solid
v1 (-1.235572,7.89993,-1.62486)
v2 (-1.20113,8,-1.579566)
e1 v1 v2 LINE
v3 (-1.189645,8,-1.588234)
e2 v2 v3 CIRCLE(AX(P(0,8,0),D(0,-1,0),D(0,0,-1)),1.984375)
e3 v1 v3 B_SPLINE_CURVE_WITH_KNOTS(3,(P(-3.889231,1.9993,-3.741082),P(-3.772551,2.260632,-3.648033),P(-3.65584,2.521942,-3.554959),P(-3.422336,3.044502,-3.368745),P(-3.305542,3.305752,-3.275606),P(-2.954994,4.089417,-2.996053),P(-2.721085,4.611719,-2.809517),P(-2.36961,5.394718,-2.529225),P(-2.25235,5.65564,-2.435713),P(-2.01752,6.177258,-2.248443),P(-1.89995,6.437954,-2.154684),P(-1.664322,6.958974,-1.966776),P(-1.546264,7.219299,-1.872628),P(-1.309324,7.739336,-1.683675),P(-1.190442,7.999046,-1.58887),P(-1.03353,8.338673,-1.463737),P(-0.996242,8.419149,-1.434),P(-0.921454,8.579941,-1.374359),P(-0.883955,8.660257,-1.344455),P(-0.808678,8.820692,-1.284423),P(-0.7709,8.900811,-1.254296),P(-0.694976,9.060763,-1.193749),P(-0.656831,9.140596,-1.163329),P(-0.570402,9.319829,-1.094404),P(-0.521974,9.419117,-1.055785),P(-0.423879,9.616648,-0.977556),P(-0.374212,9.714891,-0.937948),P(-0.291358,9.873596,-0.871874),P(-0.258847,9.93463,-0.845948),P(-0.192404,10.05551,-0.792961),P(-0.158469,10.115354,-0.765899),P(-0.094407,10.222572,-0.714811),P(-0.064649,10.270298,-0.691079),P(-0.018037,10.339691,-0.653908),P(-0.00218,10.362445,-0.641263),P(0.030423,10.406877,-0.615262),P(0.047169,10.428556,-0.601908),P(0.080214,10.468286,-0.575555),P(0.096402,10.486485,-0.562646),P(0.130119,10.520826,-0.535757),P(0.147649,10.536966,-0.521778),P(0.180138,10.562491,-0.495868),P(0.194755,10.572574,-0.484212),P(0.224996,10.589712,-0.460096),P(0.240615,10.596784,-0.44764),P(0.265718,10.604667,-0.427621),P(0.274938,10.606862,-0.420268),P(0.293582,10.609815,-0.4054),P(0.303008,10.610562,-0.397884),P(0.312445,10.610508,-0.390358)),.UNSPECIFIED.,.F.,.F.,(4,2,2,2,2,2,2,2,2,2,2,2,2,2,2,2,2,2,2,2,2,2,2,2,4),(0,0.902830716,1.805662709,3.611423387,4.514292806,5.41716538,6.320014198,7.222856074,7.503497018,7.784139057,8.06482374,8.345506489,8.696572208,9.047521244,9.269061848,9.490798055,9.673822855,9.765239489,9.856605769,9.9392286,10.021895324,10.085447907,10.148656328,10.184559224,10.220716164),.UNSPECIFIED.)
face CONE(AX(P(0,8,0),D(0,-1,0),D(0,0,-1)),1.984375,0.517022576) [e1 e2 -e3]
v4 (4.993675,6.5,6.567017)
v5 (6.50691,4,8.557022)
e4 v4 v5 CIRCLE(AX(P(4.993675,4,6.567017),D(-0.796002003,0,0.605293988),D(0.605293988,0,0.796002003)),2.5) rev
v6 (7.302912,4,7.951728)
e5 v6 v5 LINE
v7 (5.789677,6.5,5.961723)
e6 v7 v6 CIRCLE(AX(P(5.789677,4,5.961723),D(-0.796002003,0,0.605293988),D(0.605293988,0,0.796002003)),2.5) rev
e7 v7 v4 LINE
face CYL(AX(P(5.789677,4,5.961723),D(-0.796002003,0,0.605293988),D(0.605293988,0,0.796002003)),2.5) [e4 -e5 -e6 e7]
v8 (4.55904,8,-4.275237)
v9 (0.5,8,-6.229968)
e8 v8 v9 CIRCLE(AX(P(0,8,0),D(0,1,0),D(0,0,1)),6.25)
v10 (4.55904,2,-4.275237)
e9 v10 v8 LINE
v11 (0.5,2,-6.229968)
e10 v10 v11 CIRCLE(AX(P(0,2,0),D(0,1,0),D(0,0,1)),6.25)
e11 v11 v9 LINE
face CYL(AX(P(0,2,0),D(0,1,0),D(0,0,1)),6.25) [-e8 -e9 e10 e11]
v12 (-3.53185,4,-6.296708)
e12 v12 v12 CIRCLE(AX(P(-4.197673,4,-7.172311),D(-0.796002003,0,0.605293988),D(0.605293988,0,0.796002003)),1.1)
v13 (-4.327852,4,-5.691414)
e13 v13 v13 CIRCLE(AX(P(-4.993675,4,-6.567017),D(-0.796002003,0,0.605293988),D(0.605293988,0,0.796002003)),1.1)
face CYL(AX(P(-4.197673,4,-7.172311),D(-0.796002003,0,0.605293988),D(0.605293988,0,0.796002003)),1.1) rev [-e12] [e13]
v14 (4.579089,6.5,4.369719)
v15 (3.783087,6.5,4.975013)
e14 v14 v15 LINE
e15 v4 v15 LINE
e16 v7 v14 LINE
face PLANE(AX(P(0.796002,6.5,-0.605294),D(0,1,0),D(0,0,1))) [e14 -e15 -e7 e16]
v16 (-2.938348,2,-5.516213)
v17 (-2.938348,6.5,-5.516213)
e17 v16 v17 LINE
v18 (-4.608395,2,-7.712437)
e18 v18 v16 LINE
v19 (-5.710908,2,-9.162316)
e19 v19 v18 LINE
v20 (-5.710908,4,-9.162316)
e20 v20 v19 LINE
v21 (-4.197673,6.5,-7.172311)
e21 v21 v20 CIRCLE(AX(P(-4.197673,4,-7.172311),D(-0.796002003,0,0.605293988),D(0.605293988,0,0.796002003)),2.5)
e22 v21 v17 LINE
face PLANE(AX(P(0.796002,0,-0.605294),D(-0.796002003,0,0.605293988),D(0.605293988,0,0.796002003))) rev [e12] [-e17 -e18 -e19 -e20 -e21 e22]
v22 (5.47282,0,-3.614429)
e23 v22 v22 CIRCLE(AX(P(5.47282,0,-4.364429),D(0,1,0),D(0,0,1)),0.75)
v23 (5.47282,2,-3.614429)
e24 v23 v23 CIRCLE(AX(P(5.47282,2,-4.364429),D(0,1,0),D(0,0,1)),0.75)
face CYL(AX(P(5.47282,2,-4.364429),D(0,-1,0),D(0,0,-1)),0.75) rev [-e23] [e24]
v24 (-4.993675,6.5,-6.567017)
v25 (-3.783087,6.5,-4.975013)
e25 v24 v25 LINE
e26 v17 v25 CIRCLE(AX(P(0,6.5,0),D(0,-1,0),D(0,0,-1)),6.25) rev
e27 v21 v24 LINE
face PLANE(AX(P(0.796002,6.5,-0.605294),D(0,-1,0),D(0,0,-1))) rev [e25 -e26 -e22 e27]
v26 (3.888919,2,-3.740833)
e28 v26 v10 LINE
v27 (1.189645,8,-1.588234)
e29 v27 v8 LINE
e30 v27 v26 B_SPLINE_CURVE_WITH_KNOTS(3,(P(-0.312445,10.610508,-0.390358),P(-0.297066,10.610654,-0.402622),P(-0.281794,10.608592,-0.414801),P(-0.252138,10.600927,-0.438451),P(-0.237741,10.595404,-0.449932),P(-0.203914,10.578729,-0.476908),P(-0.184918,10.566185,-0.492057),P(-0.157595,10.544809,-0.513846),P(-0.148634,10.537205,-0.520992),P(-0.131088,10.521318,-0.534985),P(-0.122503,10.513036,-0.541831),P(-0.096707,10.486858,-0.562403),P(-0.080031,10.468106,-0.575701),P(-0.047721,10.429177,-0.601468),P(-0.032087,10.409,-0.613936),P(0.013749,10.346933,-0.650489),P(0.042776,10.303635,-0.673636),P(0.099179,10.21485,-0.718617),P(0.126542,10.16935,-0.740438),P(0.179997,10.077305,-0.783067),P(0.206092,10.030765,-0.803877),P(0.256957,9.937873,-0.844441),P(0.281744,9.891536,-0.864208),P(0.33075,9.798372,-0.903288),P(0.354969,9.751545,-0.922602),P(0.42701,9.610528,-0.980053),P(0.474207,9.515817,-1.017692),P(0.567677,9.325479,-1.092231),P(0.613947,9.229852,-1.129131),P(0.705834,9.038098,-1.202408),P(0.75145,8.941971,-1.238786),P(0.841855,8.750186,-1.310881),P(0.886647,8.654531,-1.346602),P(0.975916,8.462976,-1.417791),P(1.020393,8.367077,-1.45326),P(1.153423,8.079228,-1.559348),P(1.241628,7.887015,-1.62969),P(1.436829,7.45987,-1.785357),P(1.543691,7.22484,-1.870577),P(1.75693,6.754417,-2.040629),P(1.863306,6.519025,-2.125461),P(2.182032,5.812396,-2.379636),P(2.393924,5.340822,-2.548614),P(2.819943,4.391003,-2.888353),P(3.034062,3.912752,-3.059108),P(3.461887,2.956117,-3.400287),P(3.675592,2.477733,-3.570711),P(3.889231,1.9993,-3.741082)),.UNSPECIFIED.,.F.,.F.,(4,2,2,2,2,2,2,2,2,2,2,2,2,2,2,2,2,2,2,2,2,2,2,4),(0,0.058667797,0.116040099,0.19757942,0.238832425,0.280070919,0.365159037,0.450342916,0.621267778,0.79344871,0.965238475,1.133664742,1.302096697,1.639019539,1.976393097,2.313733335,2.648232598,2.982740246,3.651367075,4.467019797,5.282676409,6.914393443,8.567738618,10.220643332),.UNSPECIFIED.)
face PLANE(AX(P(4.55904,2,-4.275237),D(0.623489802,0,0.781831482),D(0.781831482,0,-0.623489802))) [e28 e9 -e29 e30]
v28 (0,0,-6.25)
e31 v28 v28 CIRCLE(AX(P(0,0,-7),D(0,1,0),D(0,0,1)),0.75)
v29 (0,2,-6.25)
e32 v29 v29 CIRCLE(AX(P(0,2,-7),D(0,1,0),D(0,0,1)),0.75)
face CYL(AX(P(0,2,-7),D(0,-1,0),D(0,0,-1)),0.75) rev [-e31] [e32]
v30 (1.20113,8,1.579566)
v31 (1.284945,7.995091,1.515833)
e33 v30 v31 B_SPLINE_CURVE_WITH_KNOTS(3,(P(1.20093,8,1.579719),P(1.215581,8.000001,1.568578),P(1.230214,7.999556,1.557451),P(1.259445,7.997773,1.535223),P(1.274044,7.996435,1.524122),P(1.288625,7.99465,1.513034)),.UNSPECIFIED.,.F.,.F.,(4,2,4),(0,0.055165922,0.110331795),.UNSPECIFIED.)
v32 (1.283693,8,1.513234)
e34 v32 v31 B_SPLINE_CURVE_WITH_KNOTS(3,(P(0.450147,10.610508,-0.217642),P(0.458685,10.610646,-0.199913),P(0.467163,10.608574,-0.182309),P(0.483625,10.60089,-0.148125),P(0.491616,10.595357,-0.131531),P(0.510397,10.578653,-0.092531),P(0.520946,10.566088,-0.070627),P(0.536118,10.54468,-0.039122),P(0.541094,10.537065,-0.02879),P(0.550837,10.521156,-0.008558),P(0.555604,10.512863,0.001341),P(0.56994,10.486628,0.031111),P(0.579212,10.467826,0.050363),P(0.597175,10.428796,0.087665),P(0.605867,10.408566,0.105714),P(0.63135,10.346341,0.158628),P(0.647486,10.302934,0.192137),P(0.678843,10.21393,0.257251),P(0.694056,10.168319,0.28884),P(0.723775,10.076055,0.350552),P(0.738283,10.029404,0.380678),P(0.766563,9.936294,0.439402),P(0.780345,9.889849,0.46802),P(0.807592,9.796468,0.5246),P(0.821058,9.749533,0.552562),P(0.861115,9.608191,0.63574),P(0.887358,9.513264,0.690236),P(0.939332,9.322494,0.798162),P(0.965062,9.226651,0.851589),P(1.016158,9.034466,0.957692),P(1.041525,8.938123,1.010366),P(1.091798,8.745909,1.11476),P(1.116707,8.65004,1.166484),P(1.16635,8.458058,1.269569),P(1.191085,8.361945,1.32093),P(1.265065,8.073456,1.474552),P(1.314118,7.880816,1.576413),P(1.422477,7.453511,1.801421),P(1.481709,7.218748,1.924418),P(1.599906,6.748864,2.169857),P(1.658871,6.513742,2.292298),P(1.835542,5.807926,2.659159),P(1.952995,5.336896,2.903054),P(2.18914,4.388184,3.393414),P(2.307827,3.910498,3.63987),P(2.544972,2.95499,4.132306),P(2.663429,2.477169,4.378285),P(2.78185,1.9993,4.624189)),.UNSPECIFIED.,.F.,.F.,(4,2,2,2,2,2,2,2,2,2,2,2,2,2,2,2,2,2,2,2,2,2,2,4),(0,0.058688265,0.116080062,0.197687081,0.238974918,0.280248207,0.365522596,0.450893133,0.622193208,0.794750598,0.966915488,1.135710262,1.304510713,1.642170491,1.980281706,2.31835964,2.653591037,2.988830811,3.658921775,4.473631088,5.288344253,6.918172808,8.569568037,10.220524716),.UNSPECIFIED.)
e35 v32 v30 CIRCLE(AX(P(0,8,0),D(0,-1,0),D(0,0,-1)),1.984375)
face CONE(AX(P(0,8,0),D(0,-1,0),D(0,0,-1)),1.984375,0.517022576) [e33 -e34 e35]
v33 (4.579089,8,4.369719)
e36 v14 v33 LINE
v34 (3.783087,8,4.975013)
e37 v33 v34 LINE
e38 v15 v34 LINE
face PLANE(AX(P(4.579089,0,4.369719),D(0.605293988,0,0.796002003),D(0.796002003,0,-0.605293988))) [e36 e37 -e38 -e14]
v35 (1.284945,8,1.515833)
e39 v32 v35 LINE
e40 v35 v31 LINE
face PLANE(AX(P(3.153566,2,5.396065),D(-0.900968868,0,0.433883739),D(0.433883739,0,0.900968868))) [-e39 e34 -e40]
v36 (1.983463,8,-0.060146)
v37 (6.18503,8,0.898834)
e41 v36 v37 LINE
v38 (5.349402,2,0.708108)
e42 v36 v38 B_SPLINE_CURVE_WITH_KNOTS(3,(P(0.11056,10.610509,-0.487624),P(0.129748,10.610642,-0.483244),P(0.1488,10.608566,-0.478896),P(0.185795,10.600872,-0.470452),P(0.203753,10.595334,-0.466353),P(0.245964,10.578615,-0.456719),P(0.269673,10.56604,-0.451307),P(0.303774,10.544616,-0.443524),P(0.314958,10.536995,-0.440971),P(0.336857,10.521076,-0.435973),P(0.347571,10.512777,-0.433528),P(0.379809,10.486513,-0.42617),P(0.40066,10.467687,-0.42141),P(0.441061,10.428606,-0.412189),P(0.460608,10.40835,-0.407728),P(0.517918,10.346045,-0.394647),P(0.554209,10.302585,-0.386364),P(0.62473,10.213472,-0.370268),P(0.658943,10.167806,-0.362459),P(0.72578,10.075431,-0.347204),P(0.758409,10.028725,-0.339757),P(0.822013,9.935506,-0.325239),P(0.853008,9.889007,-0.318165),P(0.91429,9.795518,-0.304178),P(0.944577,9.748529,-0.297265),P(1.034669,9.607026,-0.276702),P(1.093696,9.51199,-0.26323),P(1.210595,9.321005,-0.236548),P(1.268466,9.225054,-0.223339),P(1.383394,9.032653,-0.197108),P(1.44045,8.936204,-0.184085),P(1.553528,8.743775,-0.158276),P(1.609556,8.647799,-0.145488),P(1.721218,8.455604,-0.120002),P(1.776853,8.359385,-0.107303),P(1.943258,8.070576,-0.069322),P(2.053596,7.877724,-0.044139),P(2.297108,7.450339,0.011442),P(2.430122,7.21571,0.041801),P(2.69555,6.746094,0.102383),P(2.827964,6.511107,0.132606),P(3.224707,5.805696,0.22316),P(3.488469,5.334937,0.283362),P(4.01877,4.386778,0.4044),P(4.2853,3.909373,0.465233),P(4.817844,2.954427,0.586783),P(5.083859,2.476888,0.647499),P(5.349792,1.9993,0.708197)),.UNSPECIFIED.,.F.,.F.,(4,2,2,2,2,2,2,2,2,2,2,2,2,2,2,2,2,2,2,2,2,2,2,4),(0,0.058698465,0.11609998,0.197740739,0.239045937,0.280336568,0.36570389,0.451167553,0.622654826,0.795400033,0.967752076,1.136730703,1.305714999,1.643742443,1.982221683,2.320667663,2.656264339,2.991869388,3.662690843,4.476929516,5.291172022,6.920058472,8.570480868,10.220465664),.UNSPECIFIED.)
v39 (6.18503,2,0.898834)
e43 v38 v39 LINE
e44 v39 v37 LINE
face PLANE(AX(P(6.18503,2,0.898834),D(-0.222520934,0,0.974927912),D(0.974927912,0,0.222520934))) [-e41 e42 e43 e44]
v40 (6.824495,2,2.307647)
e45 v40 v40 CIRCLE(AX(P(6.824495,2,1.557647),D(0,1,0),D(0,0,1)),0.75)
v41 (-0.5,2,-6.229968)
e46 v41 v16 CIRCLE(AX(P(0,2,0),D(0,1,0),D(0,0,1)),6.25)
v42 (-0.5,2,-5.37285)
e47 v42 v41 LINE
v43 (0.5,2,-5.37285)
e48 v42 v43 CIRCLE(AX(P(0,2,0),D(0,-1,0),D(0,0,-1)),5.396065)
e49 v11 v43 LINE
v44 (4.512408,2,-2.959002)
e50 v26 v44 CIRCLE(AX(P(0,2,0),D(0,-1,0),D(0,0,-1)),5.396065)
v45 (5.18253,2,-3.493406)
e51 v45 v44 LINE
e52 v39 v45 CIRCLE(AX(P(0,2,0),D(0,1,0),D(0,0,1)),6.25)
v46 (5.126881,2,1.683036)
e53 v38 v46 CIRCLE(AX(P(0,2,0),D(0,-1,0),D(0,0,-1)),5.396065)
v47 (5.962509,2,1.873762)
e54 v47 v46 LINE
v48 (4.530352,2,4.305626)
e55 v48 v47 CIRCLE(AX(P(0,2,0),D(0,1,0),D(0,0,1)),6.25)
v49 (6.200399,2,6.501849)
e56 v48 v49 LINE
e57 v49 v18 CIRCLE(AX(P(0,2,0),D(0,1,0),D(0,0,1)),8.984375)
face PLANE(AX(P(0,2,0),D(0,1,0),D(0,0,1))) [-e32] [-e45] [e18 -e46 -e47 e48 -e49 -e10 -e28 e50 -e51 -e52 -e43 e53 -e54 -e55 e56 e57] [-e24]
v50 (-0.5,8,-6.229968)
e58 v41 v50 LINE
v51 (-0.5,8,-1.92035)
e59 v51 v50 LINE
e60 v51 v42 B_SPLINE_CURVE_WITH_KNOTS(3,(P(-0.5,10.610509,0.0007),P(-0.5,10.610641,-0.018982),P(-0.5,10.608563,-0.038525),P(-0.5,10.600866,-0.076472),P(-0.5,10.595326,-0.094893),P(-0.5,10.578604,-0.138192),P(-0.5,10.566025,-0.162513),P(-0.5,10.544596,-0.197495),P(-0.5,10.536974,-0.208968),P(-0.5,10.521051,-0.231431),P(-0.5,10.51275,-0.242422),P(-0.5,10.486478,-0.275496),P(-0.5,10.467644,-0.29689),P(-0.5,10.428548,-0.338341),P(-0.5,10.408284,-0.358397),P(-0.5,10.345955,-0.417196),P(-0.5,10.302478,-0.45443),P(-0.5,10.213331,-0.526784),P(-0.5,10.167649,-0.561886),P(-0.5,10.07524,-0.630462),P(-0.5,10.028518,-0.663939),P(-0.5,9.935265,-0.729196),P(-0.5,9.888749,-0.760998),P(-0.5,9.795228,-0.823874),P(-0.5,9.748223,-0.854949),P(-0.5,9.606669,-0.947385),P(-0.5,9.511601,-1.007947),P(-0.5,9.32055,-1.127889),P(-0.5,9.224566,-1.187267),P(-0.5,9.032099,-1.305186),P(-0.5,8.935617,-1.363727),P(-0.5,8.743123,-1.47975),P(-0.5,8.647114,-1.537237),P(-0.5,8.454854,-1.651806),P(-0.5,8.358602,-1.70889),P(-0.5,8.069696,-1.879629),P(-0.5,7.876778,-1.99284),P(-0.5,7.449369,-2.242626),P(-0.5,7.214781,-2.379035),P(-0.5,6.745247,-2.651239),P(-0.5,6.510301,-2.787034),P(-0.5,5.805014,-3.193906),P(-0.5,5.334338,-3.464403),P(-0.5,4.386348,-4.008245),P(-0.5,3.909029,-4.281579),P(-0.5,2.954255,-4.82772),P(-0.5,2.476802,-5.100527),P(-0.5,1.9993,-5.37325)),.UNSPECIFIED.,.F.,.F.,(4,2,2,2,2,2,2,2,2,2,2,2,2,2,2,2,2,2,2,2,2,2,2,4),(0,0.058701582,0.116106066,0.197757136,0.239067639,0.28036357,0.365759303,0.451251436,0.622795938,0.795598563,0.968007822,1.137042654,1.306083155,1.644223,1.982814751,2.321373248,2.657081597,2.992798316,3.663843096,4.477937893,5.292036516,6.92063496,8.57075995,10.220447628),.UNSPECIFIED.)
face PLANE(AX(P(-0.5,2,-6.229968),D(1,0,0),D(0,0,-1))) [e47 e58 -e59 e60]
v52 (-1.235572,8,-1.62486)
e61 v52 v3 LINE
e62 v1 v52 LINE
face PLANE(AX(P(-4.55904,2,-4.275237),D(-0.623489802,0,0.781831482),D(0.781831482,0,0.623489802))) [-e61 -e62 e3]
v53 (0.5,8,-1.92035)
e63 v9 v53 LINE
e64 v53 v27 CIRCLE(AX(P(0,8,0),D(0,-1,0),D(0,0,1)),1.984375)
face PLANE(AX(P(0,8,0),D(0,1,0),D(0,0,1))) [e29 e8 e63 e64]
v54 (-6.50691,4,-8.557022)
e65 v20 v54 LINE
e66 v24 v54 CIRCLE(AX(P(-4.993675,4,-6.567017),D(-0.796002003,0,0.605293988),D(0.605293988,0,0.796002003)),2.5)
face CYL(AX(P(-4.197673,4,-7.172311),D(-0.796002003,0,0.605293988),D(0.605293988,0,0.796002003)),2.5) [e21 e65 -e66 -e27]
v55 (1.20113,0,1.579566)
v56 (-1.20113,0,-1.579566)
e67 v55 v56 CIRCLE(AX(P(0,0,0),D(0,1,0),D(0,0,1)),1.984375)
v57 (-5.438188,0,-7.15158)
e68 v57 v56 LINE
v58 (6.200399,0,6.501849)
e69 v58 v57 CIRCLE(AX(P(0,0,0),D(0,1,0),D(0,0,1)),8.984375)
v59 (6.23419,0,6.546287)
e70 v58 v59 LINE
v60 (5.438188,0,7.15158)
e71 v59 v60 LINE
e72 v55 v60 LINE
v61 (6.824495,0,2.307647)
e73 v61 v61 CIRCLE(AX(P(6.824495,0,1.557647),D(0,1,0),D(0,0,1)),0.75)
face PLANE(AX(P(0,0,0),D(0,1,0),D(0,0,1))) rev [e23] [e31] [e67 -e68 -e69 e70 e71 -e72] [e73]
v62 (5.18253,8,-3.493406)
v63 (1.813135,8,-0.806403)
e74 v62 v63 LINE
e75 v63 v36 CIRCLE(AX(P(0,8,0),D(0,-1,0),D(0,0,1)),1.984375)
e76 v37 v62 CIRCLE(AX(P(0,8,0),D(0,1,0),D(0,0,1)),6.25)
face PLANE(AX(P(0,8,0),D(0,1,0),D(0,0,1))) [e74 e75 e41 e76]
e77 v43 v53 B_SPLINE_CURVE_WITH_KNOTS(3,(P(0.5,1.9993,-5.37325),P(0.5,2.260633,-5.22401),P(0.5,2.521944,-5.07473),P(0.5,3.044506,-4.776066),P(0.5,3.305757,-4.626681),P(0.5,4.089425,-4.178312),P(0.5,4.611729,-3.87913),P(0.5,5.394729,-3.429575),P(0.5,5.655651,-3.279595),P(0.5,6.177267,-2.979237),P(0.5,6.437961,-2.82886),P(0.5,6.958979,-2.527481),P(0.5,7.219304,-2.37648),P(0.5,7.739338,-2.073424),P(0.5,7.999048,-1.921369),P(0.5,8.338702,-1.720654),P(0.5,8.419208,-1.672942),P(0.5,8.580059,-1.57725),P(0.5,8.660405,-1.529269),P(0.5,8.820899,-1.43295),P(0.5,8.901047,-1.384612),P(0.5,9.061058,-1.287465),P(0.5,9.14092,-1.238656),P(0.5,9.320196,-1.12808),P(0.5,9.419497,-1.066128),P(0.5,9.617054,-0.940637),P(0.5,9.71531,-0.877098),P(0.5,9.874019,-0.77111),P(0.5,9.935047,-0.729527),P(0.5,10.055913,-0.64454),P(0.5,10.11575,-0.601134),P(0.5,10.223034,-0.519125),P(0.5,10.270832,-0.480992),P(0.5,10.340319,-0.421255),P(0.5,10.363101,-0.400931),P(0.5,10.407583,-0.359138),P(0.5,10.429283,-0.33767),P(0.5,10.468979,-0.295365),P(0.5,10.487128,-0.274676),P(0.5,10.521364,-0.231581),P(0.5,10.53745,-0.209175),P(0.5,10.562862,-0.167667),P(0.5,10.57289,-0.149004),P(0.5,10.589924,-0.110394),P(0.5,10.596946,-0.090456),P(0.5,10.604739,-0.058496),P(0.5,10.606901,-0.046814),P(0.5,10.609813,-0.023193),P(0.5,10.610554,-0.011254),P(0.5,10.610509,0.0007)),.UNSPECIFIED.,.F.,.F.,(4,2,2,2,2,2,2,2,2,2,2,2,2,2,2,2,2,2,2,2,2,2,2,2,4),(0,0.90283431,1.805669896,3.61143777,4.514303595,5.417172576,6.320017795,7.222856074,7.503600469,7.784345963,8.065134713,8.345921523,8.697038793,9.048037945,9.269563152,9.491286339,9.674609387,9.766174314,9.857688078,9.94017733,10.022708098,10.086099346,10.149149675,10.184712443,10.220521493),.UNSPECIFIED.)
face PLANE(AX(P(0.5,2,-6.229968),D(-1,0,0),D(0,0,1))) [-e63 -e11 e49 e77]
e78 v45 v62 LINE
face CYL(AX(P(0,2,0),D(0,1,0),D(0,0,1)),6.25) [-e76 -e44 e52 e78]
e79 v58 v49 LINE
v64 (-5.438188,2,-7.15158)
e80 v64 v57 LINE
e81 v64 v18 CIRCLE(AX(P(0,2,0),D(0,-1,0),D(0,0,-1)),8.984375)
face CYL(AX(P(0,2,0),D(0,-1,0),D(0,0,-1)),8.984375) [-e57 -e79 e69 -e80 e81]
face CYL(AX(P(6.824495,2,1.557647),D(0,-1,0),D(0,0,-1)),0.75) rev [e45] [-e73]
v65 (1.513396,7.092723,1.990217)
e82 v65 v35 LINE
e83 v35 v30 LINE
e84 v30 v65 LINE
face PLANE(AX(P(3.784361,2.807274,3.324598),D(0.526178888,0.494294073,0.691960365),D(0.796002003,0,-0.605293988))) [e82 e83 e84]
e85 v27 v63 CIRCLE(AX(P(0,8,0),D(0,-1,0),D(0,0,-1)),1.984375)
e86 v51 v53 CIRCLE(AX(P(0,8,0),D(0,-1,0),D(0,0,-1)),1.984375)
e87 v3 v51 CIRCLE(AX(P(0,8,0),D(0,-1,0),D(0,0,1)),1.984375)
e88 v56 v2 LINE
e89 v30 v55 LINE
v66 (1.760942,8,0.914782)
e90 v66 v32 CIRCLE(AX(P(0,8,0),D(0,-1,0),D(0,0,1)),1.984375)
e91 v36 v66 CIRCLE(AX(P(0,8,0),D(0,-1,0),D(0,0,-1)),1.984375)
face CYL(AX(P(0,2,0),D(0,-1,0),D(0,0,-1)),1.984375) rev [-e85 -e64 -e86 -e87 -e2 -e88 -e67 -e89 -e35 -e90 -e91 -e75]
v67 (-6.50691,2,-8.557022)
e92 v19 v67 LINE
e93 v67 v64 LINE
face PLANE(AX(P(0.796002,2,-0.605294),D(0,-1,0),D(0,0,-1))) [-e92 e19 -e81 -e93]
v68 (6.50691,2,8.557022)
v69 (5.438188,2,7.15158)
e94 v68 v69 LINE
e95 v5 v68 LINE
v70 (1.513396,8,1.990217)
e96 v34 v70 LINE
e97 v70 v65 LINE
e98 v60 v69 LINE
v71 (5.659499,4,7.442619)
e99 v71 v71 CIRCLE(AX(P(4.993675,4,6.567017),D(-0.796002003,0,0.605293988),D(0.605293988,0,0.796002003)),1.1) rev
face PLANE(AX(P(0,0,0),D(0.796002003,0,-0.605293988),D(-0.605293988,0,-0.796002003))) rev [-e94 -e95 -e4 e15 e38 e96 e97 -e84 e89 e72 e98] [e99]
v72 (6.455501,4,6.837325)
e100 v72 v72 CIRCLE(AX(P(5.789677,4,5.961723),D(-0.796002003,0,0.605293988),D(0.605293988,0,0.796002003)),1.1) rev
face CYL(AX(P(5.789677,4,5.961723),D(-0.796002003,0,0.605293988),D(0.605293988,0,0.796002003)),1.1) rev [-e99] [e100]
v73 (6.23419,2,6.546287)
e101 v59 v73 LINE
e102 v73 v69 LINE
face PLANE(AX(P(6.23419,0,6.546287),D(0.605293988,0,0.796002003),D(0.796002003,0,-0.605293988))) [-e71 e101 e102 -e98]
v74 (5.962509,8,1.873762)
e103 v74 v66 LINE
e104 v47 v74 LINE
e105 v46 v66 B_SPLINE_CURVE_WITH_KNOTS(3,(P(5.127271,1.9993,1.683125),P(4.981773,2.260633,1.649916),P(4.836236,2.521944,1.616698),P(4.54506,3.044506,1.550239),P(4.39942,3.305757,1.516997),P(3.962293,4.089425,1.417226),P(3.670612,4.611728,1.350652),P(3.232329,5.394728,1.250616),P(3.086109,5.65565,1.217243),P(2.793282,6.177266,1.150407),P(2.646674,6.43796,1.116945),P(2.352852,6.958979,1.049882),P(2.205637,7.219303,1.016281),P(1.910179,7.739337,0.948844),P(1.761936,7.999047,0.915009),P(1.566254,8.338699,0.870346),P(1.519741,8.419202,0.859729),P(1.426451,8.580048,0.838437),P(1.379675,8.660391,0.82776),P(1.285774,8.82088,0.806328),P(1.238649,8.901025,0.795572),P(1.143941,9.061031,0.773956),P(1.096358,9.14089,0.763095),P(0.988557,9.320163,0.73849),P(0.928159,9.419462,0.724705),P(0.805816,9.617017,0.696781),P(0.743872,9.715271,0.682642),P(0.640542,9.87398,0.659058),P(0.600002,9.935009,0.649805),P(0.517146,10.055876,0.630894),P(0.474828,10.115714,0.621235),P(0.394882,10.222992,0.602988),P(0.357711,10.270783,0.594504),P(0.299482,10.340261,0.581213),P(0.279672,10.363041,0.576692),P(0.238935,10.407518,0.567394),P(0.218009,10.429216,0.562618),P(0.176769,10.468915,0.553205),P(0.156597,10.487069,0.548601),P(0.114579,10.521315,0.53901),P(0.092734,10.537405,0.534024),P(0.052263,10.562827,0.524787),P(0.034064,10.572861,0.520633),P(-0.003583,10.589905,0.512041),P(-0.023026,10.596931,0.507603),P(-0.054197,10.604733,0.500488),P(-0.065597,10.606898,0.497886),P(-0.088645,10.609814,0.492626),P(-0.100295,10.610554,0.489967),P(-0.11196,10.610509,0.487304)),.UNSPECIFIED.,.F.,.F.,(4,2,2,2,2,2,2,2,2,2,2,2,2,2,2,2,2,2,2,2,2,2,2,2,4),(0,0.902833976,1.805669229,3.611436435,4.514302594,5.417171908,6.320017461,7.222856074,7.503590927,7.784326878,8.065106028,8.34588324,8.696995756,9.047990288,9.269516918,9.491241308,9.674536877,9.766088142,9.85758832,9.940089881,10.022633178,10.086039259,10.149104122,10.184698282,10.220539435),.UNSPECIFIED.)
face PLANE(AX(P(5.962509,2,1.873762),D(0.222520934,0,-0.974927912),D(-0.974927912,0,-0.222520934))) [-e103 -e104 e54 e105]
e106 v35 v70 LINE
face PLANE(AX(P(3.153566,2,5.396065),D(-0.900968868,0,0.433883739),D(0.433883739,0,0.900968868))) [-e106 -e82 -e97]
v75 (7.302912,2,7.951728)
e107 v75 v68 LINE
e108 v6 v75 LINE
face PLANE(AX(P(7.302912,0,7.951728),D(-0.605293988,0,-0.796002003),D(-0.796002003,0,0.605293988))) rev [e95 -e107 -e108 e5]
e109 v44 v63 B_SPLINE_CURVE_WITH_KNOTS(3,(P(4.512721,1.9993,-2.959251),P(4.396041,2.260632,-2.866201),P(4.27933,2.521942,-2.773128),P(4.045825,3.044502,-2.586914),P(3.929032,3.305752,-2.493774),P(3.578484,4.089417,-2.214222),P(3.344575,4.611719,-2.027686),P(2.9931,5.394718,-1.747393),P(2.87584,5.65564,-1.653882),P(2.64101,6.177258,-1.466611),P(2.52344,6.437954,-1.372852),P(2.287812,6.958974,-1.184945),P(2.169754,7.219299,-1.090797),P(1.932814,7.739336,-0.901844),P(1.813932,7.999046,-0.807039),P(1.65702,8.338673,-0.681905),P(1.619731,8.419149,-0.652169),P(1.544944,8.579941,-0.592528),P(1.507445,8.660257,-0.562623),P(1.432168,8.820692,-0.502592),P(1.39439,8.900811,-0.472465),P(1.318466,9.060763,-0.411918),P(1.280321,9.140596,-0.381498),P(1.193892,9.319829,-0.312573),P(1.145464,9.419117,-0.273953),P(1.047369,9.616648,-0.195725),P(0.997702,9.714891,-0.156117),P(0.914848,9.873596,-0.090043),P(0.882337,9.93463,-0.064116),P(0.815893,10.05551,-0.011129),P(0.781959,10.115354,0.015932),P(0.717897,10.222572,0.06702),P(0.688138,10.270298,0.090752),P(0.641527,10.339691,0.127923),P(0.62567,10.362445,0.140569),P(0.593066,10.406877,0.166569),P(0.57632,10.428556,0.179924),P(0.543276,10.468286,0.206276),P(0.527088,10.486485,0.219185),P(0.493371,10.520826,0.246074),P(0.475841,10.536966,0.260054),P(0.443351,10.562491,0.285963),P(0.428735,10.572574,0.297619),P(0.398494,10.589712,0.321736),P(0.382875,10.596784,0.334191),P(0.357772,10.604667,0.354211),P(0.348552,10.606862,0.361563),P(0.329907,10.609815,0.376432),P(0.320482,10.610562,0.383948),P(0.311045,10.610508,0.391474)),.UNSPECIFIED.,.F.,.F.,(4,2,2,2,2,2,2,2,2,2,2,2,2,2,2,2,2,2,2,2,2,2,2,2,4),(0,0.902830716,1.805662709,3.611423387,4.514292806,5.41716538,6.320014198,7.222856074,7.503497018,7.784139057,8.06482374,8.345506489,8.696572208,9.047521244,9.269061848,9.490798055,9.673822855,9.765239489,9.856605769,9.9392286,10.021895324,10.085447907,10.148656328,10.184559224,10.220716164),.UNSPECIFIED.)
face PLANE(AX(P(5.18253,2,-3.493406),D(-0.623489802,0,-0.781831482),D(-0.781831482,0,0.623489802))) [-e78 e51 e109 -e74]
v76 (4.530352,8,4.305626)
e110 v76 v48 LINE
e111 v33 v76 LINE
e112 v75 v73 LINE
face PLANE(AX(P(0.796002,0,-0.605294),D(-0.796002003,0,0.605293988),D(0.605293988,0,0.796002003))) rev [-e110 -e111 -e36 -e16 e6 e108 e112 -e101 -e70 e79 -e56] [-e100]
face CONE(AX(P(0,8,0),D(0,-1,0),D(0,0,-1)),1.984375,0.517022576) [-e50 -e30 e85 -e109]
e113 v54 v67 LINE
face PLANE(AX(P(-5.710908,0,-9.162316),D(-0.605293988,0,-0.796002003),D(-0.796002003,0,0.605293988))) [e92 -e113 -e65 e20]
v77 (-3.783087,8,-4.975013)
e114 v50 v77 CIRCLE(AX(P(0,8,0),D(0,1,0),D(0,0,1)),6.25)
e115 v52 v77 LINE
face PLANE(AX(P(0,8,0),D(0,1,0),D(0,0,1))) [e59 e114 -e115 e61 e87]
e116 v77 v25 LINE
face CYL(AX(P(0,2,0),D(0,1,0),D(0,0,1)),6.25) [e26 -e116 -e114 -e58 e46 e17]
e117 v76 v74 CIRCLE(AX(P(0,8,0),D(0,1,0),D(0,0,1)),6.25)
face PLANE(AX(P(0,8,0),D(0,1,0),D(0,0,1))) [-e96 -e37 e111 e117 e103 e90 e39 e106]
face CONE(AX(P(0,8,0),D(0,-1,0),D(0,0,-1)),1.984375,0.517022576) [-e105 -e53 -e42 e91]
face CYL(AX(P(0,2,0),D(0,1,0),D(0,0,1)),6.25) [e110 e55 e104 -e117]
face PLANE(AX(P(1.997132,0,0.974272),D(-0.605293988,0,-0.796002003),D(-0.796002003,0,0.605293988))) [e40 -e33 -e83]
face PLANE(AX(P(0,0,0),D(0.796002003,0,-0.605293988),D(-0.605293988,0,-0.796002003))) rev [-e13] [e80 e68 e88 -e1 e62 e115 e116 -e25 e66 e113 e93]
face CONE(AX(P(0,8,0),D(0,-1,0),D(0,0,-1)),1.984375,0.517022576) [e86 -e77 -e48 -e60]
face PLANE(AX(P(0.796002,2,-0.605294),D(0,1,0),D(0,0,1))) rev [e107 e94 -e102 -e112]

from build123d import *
from build123d.topology import SkipClean

# Parameters (mm, degrees)
SKETCH1_R               = 8.984375
SKETCH1_R_2             = 1.984375
SKETCH1_R_3             = 0.75
BOSS_EXTRUDE1_DEPTH     = 2
SKETCH6_W               = 17.96875
SKETCH6_H               = 8
CUT_EXTRUDE1_DEPTH      = 16.014593
BOSS_EXTRUDE4_START     = -1
BOSS_EXTRUDE4_OUTLINE_R = 1.1
BOSS_EXTRUDE4_DEPTH     = 1


with BuildPart() as part:
    # Sketch1 → Boss-Extrude1 (new body)
    with BuildSketch(Plane(origin=(0, 0, 0), x_dir=(1, 0, 0), z_dir=(0, 1, 0))):
        with Locations(Location((0, 0, 0), (0, 0, 270))):
            Circle(SKETCH1_R)
        with Locations(Location((0, 0, 0), (0, 0, 270))):
            Circle(SKETCH1_R_2, mode=Mode.SUBTRACT)
        with Locations(Location((0, 7, 0), (0, 0, 270))):
            Circle(SKETCH1_R_3, mode=Mode.SUBTRACT)
        with Locations(Location((5.47282, 4.364429, 0), (0, 0, 270))):
            Circle(SKETCH1_R_3, mode=Mode.SUBTRACT)
        with Locations(Location((6.824495, -1.557647, 0), (0, 0, 270))):
            Circle(SKETCH1_R_3, mode=Mode.SUBTRACT)
        with Locations(Location((3.037186, -6.306782, 0), (0, 0, 270))):
            Circle(SKETCH1_R_3, mode=Mode.SUBTRACT)
        with Locations(Location((-3.037186, -6.306782, 0), (0, 0, 270))):
            Circle(SKETCH1_R_3, mode=Mode.SUBTRACT)
        with Locations(Location((-6.824495, -1.557647, 0), (0, 0, 270))):
            Circle(SKETCH1_R_3, mode=Mode.SUBTRACT)
        with Locations(Location((-5.47282, 4.364429, 0), (0, 0, 270))):
            Circle(SKETCH1_R_3, mode=Mode.SUBTRACT)
    extrude(amount=BOSS_EXTRUDE1_DEPTH)

    # Sweep1: sweep along a path in Sketch3
    with SkipClean():  # the faces are left unmerged after this step: merging them gives an invalid solid
        with BuildLine(Plane(origin=(0, 0, 0), x_dir=(0, 0, -1), z_dir=(1, 0, 0))) as sweep1_path:
            Line((0, 2), (0, 8))
        # Sketch2 → Sweep1 (sweep)
        with BuildSketch(Plane(origin=(0, 2, 0), x_dir=(1, 0, 0), z_dir=(0, 1, 0))):
            with BuildLine():
                Line((-0.5, 6.229968), (-0.5, 1.92035))
                ThreePointArc((-0.5, 1.92035), (-0.860988, 1.78786), (-1.189645, 1.588234))
                Line((-1.189645, 1.588234), (-4.55904, 4.275237))
                ThreePointArc((-4.55904, 4.275237), (-2.711773, 5.631055), (-0.5, 6.229968))
            make_face()
            with BuildLine():
                Line((0.5, 6.229968), (0.5, 1.92035))
                ThreePointArc((0.5, 1.92035), (0.860988, 1.78786), (1.189645, 1.588234))
                Line((1.189645, 1.588234), (4.55904, 4.275237))
                ThreePointArc((4.55904, 4.275237), (2.711773, 5.631055), (0.5, 6.229968))
            make_face()
            with BuildLine():
                Line((5.18253, 3.493406), (1.813135, 0.806403))
                ThreePointArc((1.813135, 0.806403), (1.934623, 0.441565), (1.983463, 0.060146))
                Line((1.983463, 0.060146), (6.18503, -0.898834))
                ThreePointArc((6.18503, -0.898834), (6.093299, 1.390756), (5.18253, 3.493406))
            make_face()
            with BuildLine():
                Line((5.962509, -1.873762), (1.760942, -0.914782))
                ThreePointArc((1.760942, -0.914782), (1.551447, -1.237238), (1.283693, -1.513234))
                Line((1.283693, -1.513234), (3.153566, -5.396065))
                ThreePointArc((3.153566, -5.396065), (4.886447, -3.896811), (5.962509, -1.873762))
            make_face()
            with BuildLine():
                Line((2.252597, -5.829949), (0.382724, -1.947117))
                ThreePointArc((0.382724, -1.947117), (0, -1.984375), (-0.382724, -1.947117))
                Line((-0.382724, -1.947117), (-2.252597, -5.829949))
                ThreePointArc((-2.252597, -5.829949), (0, -6.25), (2.252597, -5.829949))
            make_face()
            with BuildLine():
                Line((-3.153566, -5.396065), (-1.283693, -1.513234))
                ThreePointArc((-1.283693, -1.513234), (-1.551447, -1.237238), (-1.760942, -0.914782))
                Line((-1.760942, -0.914782), (-5.962509, -1.873762))
                ThreePointArc((-5.962509, -1.873762), (-4.886447, -3.896811), (-3.153566, -5.396065))
            make_face()
            with BuildLine():
                Line((-6.18503, -0.898834), (-1.983463, 0.060146))
                ThreePointArc((-1.983463, 0.060146), (-1.934623, 0.441565), (-1.813135, 0.806403))
                Line((-1.813135, 0.806403), (-5.18253, 3.493406))
                ThreePointArc((-5.18253, 3.493406), (-6.093299, 1.390756), (-6.18503, -0.898834))
            make_face()
        sweep(path=sweep1_path.line)

    # Sketch4 → Revolve1 (revolve)
    with SkipClean():  # the faces are left unmerged after this step: merging them gives an invalid solid
        with BuildSketch(Plane(origin=(0, 0, 0), x_dir=(0, 0, -1), z_dir=(1, 0, 0)), mode=Mode.PRIVATE) as revolve1_sk:
            Polygon((-5.396065, 2), (-1.984375, 2), (-1.984375, 8), align=None)
        revolve(revolve1_sk.sketch.rotate(Axis((0, 0, 0), (0, 1, 0)), 165.405971), axis=Axis((0, 0, 0), (0, 1, 0)))

    # Sketch6 → Cut-Extrude1 (cut, through all)
    with BuildSketch(Plane(origin=(0, 0, 0), x_dir=(0.6052939880428899, 0, 0.7960020025346255), z_dir=(-0.7960020025346255, 0, 0.6052939880428899))):
        with Locations((0, 4)):
            Rectangle(SKETCH6_W, SKETCH6_H)
    extrude(amount=CUT_EXTRUDE1_DEPTH, mode=Mode.SUBTRACT)

    # Boss-Extrude4: read off the stored shape, not the designer's step
    # Boss-Extrude4 outline → Boss-Extrude4 (add)
    # profile 1 of 2: a face of its own
    with BuildSketch(Plane(origin=(0, 0, 0), x_dir=(0.60529398804289, 0, 0.7960020025346255), z_dir=(-0.7960020025346254, 0, 0.6052939880428899)).offset(BOSS_EXTRUDE4_START)):
        with BuildLine():
            Line((-6.169481, 6.5), (-8.25, 6.5))
            ThreePointArc((-8.25, 6.5), (-10.017767, 5.767767), (-10.75, 4))
            Line((-10.75, 4), (-10.75, 2))
            Line((-10.75, 2), (-6.169481, 2))
            Line((-6.169481, 2), (-6.169481, 6.5))
        make_face()
        with Locations((-8.25, 4)):
            Circle(BOSS_EXTRUDE4_OUTLINE_R, mode=Mode.SUBTRACT)
    # profile 2 of 2: a face of its own
    with BuildSketch(Plane(origin=(0, 0, 0), x_dir=(0.60529398804289, 0, 0.7960020025346255), z_dir=(-0.7960020025346254, 0, 0.6052939880428899)).offset(BOSS_EXTRUDE4_START)):
        with BuildLine():
            Line((8.984375, 0), (8.984375, 2))
            Line((8.984375, 2), (10.75, 2))
            Line((10.75, 2), (10.75, 4))
            ThreePointArc((10.75, 4), (10.017767, 5.767767), (8.25, 6.5))
            Line((8.25, 6.5), (6.25, 6.5))
            Line((6.25, 6.5), (6.25, 8))
            Line((6.25, 8), (2.500266, 8))
            Line((2.500266, 8), (2.500266, 7.092723))
            Line((2.500266, 7.092723), (1.984375, 8))
            Line((1.984375, 8), (1.984375, 0))
            Line((1.984375, 0), (8.984375, 0))
        make_face()
        with Locations((8.25, 4)):
            Circle(BOSS_EXTRUDE4_OUTLINE_R, mode=Mode.SUBTRACT)
    extrude(amount=BOSS_EXTRUDE4_DEPTH)


solid = part.part
